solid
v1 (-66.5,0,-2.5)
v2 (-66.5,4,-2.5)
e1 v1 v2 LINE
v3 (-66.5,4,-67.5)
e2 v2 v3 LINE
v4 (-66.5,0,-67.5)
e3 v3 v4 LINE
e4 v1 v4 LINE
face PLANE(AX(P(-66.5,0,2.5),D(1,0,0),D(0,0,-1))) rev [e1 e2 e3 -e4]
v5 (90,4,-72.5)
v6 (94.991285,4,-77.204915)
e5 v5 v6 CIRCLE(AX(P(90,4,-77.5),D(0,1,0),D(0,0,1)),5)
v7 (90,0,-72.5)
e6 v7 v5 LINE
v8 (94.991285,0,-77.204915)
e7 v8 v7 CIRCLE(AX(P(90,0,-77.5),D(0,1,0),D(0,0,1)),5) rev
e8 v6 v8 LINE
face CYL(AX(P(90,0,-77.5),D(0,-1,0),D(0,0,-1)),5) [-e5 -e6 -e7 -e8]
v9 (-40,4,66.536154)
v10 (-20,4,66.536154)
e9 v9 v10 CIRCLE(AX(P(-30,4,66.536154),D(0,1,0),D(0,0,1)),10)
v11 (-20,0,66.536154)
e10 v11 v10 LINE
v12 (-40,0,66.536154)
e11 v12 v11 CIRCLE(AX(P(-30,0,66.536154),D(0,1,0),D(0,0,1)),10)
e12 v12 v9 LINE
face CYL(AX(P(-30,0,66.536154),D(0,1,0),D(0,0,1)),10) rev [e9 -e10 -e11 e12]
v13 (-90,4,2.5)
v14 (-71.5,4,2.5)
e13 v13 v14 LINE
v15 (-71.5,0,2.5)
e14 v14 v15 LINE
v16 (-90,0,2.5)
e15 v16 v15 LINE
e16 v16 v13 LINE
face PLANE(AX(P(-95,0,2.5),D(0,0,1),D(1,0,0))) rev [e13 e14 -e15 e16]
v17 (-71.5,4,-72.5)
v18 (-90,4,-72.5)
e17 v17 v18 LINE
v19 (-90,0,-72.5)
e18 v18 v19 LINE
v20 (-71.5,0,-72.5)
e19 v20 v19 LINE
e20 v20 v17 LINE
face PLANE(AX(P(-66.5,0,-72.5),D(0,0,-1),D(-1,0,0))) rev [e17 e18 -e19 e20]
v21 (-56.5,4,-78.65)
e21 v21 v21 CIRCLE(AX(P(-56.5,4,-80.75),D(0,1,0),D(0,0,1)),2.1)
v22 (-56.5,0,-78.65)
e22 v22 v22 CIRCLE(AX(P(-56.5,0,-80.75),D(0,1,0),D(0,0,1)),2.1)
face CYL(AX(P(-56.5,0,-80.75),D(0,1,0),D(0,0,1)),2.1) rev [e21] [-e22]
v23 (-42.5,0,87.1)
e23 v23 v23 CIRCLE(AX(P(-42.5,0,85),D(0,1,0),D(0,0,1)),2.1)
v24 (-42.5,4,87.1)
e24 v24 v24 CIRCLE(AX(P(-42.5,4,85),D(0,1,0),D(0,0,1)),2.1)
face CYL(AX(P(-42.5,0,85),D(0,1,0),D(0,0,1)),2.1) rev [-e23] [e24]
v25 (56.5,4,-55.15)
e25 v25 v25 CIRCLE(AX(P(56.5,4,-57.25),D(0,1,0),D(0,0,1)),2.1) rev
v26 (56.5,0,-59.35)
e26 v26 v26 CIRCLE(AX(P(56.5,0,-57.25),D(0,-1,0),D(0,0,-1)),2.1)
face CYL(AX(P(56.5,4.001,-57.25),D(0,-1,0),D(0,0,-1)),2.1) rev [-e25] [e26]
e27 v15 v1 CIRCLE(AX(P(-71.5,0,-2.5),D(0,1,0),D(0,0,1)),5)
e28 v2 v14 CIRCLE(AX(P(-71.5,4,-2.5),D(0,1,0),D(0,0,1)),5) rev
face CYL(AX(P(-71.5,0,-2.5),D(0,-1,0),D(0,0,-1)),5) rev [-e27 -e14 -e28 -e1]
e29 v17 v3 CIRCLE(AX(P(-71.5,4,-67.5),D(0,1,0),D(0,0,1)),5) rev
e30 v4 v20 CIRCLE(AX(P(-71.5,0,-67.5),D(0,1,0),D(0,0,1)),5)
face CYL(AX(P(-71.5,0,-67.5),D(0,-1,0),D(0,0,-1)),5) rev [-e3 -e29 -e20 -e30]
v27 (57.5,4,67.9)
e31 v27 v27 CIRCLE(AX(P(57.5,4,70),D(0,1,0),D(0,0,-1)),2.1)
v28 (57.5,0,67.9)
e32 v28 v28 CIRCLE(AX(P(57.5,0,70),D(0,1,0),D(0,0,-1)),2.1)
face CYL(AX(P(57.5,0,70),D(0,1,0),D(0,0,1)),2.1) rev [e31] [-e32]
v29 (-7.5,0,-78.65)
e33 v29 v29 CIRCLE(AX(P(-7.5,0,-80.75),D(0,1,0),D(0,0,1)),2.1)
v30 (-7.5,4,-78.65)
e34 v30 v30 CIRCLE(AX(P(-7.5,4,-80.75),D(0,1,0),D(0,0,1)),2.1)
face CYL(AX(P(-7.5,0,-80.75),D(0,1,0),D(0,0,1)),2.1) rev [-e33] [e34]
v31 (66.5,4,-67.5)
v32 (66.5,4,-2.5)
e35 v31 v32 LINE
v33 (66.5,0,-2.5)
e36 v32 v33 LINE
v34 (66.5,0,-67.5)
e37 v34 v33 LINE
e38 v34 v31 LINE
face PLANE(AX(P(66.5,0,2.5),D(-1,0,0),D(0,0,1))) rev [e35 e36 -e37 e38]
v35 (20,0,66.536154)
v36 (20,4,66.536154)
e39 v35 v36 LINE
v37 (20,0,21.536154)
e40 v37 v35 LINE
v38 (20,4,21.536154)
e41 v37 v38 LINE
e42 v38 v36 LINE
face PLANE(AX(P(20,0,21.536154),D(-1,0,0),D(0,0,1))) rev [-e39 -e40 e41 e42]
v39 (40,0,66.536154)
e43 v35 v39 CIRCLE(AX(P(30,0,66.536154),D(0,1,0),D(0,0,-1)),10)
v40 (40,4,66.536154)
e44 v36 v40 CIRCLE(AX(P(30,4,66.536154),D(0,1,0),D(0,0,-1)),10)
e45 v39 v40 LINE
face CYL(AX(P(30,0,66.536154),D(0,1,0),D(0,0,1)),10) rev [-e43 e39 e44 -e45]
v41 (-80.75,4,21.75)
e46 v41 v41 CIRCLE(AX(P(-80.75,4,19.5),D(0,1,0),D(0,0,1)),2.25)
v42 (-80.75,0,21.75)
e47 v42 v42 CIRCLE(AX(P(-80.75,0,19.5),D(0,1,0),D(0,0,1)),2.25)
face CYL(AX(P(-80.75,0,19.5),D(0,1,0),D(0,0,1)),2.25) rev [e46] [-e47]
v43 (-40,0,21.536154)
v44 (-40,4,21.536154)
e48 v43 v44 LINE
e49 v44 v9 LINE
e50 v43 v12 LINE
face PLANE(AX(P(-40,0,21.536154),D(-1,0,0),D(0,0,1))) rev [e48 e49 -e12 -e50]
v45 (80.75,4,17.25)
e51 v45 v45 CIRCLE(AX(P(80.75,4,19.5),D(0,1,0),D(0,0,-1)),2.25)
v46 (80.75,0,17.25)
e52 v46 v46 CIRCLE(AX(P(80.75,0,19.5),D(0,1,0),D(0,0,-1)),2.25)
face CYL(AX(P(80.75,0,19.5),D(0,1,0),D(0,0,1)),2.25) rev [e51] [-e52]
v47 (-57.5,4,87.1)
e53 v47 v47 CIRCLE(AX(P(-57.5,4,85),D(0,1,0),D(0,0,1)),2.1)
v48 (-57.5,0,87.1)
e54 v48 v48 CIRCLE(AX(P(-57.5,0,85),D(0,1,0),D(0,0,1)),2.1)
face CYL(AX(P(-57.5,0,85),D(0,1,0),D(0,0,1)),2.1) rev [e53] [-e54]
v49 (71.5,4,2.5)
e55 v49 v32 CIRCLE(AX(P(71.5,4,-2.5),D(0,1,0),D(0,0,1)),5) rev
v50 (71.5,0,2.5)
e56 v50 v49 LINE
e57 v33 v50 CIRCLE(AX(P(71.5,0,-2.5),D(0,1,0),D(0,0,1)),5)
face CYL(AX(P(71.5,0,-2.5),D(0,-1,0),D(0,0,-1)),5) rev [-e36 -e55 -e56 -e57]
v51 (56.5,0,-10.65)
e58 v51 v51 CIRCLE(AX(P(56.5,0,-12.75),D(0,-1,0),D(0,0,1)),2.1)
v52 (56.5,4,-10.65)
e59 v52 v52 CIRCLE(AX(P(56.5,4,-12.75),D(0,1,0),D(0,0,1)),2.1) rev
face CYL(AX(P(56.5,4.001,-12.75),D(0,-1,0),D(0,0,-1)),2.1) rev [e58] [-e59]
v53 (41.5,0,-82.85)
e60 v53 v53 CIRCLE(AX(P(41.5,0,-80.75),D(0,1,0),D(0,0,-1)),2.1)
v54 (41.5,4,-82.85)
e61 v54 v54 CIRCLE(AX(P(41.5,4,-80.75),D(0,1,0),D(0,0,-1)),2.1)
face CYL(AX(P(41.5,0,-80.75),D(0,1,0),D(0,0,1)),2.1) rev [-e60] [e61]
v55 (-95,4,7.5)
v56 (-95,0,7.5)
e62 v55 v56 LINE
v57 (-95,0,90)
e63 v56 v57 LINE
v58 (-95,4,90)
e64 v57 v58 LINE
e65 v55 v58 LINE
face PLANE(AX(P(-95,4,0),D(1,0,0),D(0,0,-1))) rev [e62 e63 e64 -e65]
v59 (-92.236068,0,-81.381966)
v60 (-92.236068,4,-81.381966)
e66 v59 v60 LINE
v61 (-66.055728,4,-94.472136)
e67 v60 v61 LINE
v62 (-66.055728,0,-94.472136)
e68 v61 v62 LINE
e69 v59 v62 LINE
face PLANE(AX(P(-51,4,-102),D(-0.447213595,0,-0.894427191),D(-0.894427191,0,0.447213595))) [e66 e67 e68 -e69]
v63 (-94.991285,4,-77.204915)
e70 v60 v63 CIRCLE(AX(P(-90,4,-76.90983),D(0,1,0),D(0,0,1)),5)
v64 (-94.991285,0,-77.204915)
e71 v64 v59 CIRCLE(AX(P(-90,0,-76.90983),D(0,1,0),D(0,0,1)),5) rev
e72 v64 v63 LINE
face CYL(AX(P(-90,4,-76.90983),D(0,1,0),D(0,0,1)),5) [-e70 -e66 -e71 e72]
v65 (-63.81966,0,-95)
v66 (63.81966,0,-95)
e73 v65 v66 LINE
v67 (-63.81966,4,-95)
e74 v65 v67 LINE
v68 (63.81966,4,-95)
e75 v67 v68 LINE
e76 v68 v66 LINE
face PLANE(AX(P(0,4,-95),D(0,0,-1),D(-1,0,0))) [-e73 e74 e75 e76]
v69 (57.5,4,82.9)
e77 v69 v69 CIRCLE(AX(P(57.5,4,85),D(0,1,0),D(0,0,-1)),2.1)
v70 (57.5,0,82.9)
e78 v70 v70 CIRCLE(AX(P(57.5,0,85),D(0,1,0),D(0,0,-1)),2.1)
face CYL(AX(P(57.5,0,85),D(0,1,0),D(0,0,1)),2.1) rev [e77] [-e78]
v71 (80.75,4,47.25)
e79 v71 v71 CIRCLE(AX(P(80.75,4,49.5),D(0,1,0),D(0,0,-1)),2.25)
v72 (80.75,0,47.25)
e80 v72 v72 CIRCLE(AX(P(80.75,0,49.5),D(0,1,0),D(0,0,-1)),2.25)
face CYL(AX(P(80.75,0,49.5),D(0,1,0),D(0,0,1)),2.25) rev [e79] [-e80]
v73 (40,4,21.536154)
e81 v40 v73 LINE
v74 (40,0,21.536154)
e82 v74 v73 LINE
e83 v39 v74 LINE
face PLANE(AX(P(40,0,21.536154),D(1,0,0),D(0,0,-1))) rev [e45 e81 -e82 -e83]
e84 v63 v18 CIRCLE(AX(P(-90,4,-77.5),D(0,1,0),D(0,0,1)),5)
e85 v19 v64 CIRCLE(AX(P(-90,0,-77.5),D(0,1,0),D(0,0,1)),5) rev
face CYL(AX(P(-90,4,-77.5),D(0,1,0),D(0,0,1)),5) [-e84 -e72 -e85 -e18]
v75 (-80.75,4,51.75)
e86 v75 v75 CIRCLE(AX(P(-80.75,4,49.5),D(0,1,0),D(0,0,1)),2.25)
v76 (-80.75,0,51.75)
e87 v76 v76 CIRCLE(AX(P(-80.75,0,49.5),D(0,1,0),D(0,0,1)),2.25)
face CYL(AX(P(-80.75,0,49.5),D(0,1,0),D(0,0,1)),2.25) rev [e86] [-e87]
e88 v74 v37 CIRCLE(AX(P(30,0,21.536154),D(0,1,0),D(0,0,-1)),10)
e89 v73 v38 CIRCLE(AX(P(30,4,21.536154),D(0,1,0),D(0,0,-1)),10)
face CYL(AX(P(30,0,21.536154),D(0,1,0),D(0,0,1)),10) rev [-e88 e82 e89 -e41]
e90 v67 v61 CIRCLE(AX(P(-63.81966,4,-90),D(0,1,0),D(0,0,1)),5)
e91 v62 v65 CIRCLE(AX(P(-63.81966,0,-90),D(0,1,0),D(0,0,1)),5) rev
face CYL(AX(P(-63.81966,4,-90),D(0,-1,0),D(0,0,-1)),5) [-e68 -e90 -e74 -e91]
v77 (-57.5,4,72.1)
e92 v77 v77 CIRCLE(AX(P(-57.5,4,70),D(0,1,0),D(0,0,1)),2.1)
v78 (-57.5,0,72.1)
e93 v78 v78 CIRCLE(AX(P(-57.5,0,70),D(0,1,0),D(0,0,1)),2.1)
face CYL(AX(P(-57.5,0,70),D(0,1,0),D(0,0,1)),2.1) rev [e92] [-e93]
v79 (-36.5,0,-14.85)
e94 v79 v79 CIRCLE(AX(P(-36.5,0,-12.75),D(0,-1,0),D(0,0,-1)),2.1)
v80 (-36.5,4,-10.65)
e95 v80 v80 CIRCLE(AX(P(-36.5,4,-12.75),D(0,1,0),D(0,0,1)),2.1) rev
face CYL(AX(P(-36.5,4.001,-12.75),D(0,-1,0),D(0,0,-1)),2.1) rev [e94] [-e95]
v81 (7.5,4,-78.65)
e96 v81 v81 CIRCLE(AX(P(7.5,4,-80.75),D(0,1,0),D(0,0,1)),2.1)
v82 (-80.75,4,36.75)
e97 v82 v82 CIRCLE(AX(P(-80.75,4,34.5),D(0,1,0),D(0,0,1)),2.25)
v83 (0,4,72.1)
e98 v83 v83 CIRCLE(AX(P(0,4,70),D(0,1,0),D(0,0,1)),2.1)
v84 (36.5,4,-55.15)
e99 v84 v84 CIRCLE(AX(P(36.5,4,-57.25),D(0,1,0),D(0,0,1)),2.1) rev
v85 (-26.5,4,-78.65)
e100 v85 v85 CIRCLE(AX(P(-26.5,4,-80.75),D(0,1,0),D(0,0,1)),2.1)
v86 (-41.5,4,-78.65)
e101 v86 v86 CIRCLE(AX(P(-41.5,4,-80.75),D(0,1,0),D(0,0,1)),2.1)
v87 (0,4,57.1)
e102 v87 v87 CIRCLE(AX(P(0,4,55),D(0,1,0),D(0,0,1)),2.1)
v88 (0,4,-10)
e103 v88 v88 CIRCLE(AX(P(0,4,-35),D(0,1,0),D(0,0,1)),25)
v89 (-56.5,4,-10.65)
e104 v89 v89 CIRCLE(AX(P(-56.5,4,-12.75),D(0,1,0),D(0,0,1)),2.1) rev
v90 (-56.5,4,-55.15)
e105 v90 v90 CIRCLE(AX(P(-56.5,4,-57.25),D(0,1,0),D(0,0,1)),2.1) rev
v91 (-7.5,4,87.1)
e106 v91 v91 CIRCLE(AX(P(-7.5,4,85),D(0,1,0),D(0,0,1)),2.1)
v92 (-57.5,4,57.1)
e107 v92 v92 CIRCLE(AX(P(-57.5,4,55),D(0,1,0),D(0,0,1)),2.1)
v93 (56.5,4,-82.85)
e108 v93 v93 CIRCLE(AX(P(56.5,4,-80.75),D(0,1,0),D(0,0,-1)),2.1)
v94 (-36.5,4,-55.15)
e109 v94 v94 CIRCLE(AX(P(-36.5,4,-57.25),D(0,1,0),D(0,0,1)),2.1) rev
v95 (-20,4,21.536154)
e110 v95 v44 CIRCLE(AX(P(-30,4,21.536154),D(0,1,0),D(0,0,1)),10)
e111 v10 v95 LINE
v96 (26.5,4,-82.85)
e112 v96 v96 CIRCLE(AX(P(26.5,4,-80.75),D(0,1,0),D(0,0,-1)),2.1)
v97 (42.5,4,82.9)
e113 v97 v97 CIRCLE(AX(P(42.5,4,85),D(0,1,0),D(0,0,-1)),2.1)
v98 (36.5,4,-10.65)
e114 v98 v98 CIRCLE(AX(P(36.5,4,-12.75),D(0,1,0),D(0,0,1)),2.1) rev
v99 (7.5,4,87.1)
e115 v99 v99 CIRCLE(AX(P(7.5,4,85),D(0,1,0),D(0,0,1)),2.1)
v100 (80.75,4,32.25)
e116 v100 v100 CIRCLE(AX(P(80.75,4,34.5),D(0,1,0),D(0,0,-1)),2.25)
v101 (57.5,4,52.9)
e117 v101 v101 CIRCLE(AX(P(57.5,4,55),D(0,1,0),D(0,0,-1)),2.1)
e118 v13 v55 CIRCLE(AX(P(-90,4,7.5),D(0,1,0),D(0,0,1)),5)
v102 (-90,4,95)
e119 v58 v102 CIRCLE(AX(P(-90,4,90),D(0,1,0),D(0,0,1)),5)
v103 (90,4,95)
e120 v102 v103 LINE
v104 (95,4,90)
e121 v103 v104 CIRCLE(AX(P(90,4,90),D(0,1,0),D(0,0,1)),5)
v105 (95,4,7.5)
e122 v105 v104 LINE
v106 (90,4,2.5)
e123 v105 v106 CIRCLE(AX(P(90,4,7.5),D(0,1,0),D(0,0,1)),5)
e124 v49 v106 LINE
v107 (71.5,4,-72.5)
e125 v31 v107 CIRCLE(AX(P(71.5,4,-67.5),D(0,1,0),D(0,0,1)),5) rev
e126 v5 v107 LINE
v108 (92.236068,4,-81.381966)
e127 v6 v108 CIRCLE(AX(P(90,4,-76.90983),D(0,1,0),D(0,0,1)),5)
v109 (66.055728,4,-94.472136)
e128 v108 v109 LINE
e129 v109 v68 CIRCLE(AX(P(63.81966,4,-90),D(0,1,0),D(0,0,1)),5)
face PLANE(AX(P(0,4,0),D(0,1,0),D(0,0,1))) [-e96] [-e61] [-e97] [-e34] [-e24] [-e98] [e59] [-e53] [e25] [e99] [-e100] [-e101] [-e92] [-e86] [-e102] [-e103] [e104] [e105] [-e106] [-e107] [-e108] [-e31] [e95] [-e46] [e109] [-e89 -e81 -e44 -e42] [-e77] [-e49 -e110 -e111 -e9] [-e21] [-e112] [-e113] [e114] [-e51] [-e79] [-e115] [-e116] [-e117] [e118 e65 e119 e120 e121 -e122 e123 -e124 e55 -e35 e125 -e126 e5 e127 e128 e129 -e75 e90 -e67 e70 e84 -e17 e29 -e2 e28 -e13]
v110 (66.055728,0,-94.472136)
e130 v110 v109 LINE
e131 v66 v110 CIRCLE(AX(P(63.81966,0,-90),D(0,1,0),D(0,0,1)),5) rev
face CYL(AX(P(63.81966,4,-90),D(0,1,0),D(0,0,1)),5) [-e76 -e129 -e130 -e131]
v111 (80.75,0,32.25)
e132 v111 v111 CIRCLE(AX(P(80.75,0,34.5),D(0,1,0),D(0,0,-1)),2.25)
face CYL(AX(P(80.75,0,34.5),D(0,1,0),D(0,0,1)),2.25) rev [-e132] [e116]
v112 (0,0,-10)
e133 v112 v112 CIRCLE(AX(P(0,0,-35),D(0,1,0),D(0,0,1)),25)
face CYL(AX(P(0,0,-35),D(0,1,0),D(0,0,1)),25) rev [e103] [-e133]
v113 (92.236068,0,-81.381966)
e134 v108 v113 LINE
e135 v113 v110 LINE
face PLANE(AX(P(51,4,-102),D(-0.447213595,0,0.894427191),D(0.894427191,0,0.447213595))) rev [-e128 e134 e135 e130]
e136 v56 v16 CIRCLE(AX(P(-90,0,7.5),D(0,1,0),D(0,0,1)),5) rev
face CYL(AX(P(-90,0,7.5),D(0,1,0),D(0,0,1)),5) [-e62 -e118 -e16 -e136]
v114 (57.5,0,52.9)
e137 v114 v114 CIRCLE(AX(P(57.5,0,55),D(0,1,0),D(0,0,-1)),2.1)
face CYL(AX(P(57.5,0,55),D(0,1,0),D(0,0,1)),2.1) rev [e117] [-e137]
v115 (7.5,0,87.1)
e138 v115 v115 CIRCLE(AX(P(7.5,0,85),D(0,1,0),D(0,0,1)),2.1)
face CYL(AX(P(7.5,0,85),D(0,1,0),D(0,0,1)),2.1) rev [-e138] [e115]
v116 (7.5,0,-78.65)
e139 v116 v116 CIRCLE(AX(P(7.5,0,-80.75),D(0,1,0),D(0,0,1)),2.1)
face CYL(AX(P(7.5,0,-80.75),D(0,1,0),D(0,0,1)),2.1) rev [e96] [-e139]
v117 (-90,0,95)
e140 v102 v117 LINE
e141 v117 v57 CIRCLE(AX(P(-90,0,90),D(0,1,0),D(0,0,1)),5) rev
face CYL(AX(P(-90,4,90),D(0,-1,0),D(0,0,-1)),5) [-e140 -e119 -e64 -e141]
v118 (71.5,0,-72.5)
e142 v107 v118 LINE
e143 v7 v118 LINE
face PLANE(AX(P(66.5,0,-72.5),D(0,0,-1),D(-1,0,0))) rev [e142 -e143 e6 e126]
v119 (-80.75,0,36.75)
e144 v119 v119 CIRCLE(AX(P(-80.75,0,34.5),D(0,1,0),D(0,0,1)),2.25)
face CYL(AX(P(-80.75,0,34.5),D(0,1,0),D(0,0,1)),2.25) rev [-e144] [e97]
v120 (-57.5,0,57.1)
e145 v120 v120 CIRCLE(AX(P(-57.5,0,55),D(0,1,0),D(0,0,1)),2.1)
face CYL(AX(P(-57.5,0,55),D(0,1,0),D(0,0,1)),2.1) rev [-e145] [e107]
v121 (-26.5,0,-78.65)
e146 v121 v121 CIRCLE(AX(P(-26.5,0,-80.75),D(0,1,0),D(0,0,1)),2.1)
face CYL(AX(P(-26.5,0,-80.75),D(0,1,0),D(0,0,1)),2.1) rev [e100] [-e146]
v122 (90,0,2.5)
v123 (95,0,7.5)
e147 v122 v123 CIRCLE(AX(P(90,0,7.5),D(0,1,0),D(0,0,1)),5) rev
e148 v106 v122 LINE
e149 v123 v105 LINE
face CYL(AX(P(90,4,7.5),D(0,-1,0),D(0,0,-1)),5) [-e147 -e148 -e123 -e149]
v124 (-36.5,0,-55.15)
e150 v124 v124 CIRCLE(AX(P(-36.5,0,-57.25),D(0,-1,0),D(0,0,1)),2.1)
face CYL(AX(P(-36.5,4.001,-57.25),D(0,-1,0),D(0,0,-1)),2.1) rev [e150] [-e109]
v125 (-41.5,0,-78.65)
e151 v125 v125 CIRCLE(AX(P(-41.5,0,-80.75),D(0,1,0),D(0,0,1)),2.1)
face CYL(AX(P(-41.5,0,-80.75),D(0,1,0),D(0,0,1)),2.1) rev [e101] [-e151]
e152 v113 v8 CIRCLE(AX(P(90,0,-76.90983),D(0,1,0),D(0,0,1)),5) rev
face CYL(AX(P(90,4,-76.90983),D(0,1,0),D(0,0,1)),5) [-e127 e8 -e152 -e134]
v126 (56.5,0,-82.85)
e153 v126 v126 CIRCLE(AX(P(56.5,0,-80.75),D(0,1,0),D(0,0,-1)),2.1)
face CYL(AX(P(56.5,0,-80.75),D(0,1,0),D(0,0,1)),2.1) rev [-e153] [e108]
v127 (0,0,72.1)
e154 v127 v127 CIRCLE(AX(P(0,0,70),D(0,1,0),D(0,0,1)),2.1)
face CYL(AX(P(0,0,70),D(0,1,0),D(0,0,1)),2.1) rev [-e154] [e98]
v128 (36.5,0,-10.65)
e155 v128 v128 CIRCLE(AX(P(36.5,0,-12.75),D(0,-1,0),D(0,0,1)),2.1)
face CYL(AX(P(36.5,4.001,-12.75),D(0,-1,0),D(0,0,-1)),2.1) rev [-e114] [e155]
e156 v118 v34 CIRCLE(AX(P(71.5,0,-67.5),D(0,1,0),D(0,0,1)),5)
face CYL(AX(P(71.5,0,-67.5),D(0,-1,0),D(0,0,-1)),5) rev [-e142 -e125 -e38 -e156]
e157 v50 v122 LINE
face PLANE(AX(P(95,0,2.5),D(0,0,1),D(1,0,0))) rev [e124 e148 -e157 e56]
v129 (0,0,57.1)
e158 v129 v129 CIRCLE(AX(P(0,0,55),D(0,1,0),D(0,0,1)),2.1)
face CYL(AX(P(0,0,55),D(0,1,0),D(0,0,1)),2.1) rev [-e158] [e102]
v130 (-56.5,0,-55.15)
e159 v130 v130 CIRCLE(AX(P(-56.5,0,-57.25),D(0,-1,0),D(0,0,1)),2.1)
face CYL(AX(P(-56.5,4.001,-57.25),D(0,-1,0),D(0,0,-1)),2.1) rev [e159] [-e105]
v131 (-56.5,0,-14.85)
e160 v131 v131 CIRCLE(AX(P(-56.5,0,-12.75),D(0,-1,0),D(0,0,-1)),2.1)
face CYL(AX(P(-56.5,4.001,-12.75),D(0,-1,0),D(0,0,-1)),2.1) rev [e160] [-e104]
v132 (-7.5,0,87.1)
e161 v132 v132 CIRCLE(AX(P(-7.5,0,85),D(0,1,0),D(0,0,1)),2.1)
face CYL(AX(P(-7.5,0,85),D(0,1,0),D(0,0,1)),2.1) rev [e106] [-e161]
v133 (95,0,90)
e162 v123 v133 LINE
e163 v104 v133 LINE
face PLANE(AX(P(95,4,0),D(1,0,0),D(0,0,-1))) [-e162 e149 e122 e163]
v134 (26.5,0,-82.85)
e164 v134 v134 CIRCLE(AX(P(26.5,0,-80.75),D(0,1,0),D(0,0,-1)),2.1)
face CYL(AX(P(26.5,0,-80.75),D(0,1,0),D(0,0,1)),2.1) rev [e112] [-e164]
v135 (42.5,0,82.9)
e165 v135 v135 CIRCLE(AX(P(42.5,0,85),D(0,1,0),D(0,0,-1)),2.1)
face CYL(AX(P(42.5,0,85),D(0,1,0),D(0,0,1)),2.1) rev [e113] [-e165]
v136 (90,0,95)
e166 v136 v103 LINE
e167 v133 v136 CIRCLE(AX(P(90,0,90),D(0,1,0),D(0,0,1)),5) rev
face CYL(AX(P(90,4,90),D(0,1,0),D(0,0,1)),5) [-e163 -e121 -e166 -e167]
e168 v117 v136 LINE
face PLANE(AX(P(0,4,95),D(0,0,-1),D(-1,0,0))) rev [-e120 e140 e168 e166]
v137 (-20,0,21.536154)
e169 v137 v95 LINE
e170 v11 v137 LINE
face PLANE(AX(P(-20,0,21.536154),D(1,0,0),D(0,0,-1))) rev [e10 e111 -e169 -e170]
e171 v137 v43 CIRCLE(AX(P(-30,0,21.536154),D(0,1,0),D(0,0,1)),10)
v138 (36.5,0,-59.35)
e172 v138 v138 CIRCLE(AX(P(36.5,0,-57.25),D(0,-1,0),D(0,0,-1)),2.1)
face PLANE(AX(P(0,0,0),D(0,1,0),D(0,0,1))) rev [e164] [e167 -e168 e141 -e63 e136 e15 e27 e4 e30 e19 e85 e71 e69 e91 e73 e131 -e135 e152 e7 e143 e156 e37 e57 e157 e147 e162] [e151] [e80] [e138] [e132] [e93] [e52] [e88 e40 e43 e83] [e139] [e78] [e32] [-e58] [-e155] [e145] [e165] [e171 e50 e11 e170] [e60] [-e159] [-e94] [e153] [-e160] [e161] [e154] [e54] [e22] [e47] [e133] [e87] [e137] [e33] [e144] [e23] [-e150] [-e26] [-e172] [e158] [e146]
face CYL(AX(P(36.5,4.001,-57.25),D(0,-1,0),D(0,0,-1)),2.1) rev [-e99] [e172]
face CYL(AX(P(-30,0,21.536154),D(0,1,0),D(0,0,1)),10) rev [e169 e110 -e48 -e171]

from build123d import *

# Parameters (mm, degrees)
SALIENTE_EXTRUIR1_DEPTH = 4
CROQUIS3_W              = 28.5
CROQUIS3_H              = 75
CORTAR_EXTRUIR1_DEPTH   = 135.40982107
CROQUIS4_R              = 2.25
CROQUIS4_R_2            = 2.1
CORTAR_EXTRUIR2_DEPTH   = 135.40982107
CROQUIS5_R              = 25
CORTAR_EXTRUIR3_DEPTH   = 135.40982107
REDONDEO1_R             = 5
CROQUIS6_R              = 2.1
CORTAR_EXTRUIR4_DEPTH   = 135.40982107
CROQUIS7_R              = 2.1
CORTAR_EXTRUIR5_DEPTH   = 135.40982107
CORTAR_EXTRUIR6_REACH   = 136.41
CROQUIS8_R              = 2.1
CROQUIS9_R              = 2.1
CORTAR_EXTRUIR7_DEPTH   = 135.40982107


with BuildPart() as part:
    # Croquis2 → Saliente-Extruir1 (new body)
    with BuildSketch(Plane(origin=(0, 0, 0), x_dir=(1, 0, 0), z_dir=(0, 1, 0))):
        Polygon((-65, 95), (-95, 80), (-95, -95), (95, -95), (95, 80), (65, 95), align=None)
    extrude(amount=SALIENTE_EXTRUIR1_DEPTH)

    # Croquis3 → Cortar-Extruir1 (cut, through all)
    with BuildSketch(Plane(origin=(0, 4, 0), x_dir=(1, 0, 0), z_dir=(0, 1, 0))):
        with Locations((-80.75, 35)):
            Rectangle(CROQUIS3_W, CROQUIS3_H)
        with Locations((80.75, 35)):
            Rectangle(CROQUIS3_W, CROQUIS3_H)
    extrude(amount=-CORTAR_EXTRUIR1_DEPTH, mode=Mode.SUBTRACT)

    # Croquis4 → Cortar-Extruir2 (cut, through all)
    with BuildSketch(Plane(origin=(0, 4, 0), x_dir=(1, 0, 0), z_dir=(0, 1, 0))):
        with Locations(Location((-80.75, -19.5, 0), (0, 0, 270))):
            Circle(CROQUIS4_R)
        with Locations(Location((-80.75, -34.5, 0), (0, 0, 270))):
            Circle(CROQUIS4_R)
        with Locations(Location((-80.75, -49.5, 0), (0, 0, 270))):
            Circle(CROQUIS4_R)
        with Locations(Location((-56.5, 80.75, 0), (0, 0, 270))):
            Circle(CROQUIS4_R_2)
        with Locations(Location((-41.5, 80.75, 0), (0, 0, 270))):
            Circle(CROQUIS4_R_2)
        with Locations(Location((-26.5, 80.75, 0), (0, 0, 270))):
            Circle(CROQUIS4_R_2)
        with Locations(Location((80.75, -49.5, 0), (0, 0, 90))):
            Circle(CROQUIS4_R)
        with Locations(Location((80.75, -34.5, 0), (0, 0, 90))):
            Circle(CROQUIS4_R)
        with Locations(Location((80.75, -19.5, 0), (0, 0, 90))):
            Circle(CROQUIS4_R)
        with Locations(Location((26.5, 80.75, 0), (0, 0, 90))):
            Circle(CROQUIS4_R_2)
        with Locations(Location((41.5, 80.75, 0), (0, 0, 90))):
            Circle(CROQUIS4_R_2)
        with Locations(Location((56.5, 80.75, 0), (0, 0, 90))):
            Circle(CROQUIS4_R_2)
    extrude(amount=-CORTAR_EXTRUIR2_DEPTH, mode=Mode.SUBTRACT)

    # Croquis5 → Cortar-Extruir3 (cut, through all)
    with BuildSketch(Plane(origin=(0, 4, 0), x_dir=(1, 0, 0), z_dir=(0, 1, 0))):
        with Locations(Location((0, 35, 0), (0, 0, 270))):
            Circle(CROQUIS5_R)
        with BuildLine():
            Line((-20, -21.536154127), (-20, -66.536154127))
            ThreePointArc((-20, -66.536154127), (-30, -76.536154127), (-40, -66.536154127))
            Line((-40, -66.536154127), (-40, -21.536154127))
            ThreePointArc((-40, -21.536154127), (-30, -11.536154127), (-20, -21.536154127))
        make_face()
        with BuildLine():
            Line((20, -21.536154127), (20, -66.536154127))
            ThreePointArc((20, -66.536154127), (30, -76.536154127), (40, -66.536154127))
            Line((40, -66.536154127), (40, -21.536154127))
            ThreePointArc((40, -21.536154127), (30, -11.536154127), (20, -21.536154127))
        make_face()
    extrude(amount=-CORTAR_EXTRUIR3_DEPTH, mode=Mode.SUBTRACT)

    # Redondeo1
    # the kernel refuses this fillet: 5 mm, written as the material it adds along each edge
    with BuildSketch(Plane(origin=(-66.5, 4, -72.5), x_dir=(-1, 0, 0), z_dir=(0, -1, 0)), Plane(origin=(-66.5, 4, 2.5), x_dir=(0, 0, -1), z_dir=(0, -1, 0))) as redondeo1_piece_1:
        with BuildLine():
            CenterArc((REDONDEO1_R, -REDONDEO1_R), REDONDEO1_R, 90, 90)
            Line((0, -REDONDEO1_R), (0, 0))
            Line((0, 0), (REDONDEO1_R, 0))
        make_face()
    extrude(amount=4)
    with BuildSketch(Plane(origin=(66.5, 4, -72.5), x_dir=(1, 0, 0), z_dir=(0, -1, 0)), Plane(origin=(66.5, 4, 2.5), x_dir=(0, 0, -1), z_dir=(0, -1, 0))) as redondeo1_piece_2:
        with BuildLine():
            CenterArc((REDONDEO1_R, REDONDEO1_R), REDONDEO1_R, 180, 90)
            Line((0, REDONDEO1_R), (0, 0))
            Line((0, 0), (REDONDEO1_R, 0))
        make_face()
    extrude(amount=4)
    # the kernel refuses this fillet: 5 mm, written as the material it takes off along each edge
    with BuildSketch(Plane(origin=(95, -12.5, 95), x_dir=(0, 0, -1), z_dir=(0, 1, 0)), Plane(origin=(-95, -12.5, 95), x_dir=(1, 0, 0), z_dir=(0, 1, 0)), Plane(origin=(-95, 16.5, -72.5), x_dir=(0, 0, -1), z_dir=(0, -1, 0))) as redondeo1_2_piece_1:
        with BuildLine():
            CenterArc((REDONDEO1_R, REDONDEO1_R), REDONDEO1_R, 180, 90)
            Line((0, REDONDEO1_R), (0, 0))
            Line((0, 0), (REDONDEO1_R, 0))
        make_face()
    extrude(amount=29, mode=Mode.SUBTRACT)
    with BuildSketch(Plane(origin=(-95, -7.725424859, -80), x_dir=(0.894427190999916, 0, -0.447213595499958), z_dir=(0, 1, 0))) as redondeo1_2_piece_2:
        with BuildLine():
            CenterArc((REDONDEO1_R * 0.61803398875, -REDONDEO1_R), REDONDEO1_R, 90, 63.434948823)
            Line((-REDONDEO1_R * 0.27639320225, -REDONDEO1_R * 0.5527864045), (0, 0))
            Line((0, 0), (REDONDEO1_R * 0.61803398875, 0))
        make_face()
    extrude(amount=19.450849719, mode=Mode.SUBTRACT)
    with BuildSketch(Plane(origin=(-65, -2.950849719, -95), x_dir=(1, 0, 0), z_dir=(0, 1, 0)), Plane(origin=(65, -2.950849719, -95), x_dir=(0.8944271909999183, 0, 0.44721359549995315), z_dir=(0, 1, 0))) as redondeo1_2_piece_3:
        with BuildLine():
            CenterArc((REDONDEO1_R * 0.2360679775, -REDONDEO1_R), REDONDEO1_R, 90, 26.565051177)
            Line((-REDONDEO1_R * 0.211145618, -REDONDEO1_R * 0.105572809), (0, 0))
            Line((0, 0), (REDONDEO1_R * 0.2360679775, 0))
        make_face()
    extrude(amount=9.901699437, mode=Mode.SUBTRACT)
    with BuildSketch(Plane(origin=(95, -7.725424859, -80), x_dir=(-0.894427190999915, 0, -0.4472135954999598), z_dir=(0, 1, 0))) as redondeo1_2_piece_4:
        with BuildLine():
            CenterArc((REDONDEO1_R * 0.61803398875, REDONDEO1_R), REDONDEO1_R, 206.565051177, 63.434948823)
            Line((-REDONDEO1_R * 0.27639320225, REDONDEO1_R * 0.5527864045), (0, 0))
            Line((0, 0), (REDONDEO1_R * 0.61803398875, 0))
        make_face()
    extrude(amount=19.450849719, mode=Mode.SUBTRACT)
    with BuildSketch(Plane(origin=(-95, 16.5, 2.5), x_dir=(0, 0, 1), z_dir=(0, -1, 0)), Plane(origin=(95, 16.5, -72.5), x_dir=(0, 0, -1), z_dir=(0, -1, 0)), Plane(origin=(95, 16.5, 2.5), x_dir=(-1, 0, 0), z_dir=(0, -1, 0))) as redondeo1_2_piece_5:
        with BuildLine():
            CenterArc((REDONDEO1_R, -REDONDEO1_R), REDONDEO1_R, 90, 90)
            Line((0, -REDONDEO1_R), (0, 0))
            Line((0, 0), (REDONDEO1_R, 0))
        make_face()
    extrude(amount=29, mode=Mode.SUBTRACT)

    # Croquis6 → Cortar-Extruir4 (cut, through all)
    with BuildSketch(Plane(origin=(0, 4, 0), x_dir=(1, 0, 0), z_dir=(0, 1, 0))):
        with Locations(Location((-57.5, -85, 0), (0, 0, 270))):
            Circle(CROQUIS6_R)
        with Locations(Location((-42.5, -85, 0), (0, 0, 270))):
            Circle(CROQUIS6_R)
        with Locations(Location((42.5, -85, 0), (0, 0, 90))):
            Circle(CROQUIS6_R)
        with Locations(Location((57.5, -85, 0), (0, 0, 90))):
            Circle(CROQUIS6_R)
        with Locations(Location((-7.5, -85, 0), (0, 0, 270))):
            Circle(CROQUIS6_R)
        with Locations(Location((7.5, -85, 0), (0, 0, 270))):
            Circle(CROQUIS6_R)
    extrude(amount=-CORTAR_EXTRUIR4_DEPTH, mode=Mode.SUBTRACT)

    # Croquis7 → Cortar-Extruir5 (cut, through all)
    with BuildSketch(Plane(origin=(0, 4, 0), x_dir=(1, 0, 0), z_dir=(0, 1, 0))):
        with Locations(Location((-57.5, -70, 0), (0, 0, 270))):
            Circle(CROQUIS7_R)
        with Locations(Location((-57.5, -55, 0), (0, 0, 270))):
            Circle(CROQUIS7_R)
        with Locations(Location((57.5, -55, 0), (0, 0, 90))):
            Circle(CROQUIS7_R)
        with Locations(Location((57.5, -70, 0), (0, 0, 90))):
            Circle(CROQUIS7_R)
        with Locations(Location((0, -70, 0), (0, 0, 270))):
            Circle(CROQUIS7_R)
        with Locations(Location((0, -55, 0), (0, 0, 270))):
            Circle(CROQUIS7_R)
    extrude(amount=-CORTAR_EXTRUIR5_DEPTH, mode=Mode.SUBTRACT)

    # Croquis8 → Cortar-Extruir6 (cut, up to next)
    with BuildSketch(Plane.XZ, mode=Mode.PRIVATE) as cortar_extruir6_sk1:
        with Locations(Location((56.5, -57.25, 0), (0, 0, 270))):
            Circle(CROQUIS8_R)
    cortar_extruir6_tool1 = extrude(cortar_extruir6_sk1.sketch, amount=-CORTAR_EXTRUIR6_REACH, mode=Mode.PRIVATE) & part.part
    # Croquis8 → Cortar-Extruir6 (cut, up to next)
    with BuildSketch(Plane.XZ, mode=Mode.PRIVATE) as cortar_extruir6_sk2:
        with Locations(Location((36.5, -57.25, 0), (0, 0, 270))):
            Circle(CROQUIS8_R)
    cortar_extruir6_tool2 = extrude(cortar_extruir6_sk2.sketch, amount=-CORTAR_EXTRUIR6_REACH, mode=Mode.PRIVATE) & part.part
    # Croquis8 → Cortar-Extruir6 (cut, up to next)
    with BuildSketch(Plane.XZ, mode=Mode.PRIVATE) as cortar_extruir6_sk3:
        with Locations(Location((56.5, -12.75, 0), (0, 0, 90))):
            Circle(CROQUIS8_R)
    cortar_extruir6_tool3 = extrude(cortar_extruir6_sk3.sketch, amount=-CORTAR_EXTRUIR6_REACH, mode=Mode.PRIVATE) & part.part
    # Croquis8 → Cortar-Extruir6 (cut, up to next)
    with BuildSketch(Plane.XZ, mode=Mode.PRIVATE) as cortar_extruir6_sk4:
        with Locations(Location((36.5, -12.75, 0), (0, 0, 90))):
            Circle(CROQUIS8_R)
    cortar_extruir6_tool4 = extrude(cortar_extruir6_sk4.sketch, amount=-CORTAR_EXTRUIR6_REACH, mode=Mode.PRIVATE) & part.part
    # Croquis8 → Cortar-Extruir6 (cut, up to next)
    with BuildSketch(Plane.XZ, mode=Mode.PRIVATE) as cortar_extruir6_sk5:
        with Locations(Location((-36.5, -12.75, 0), (0, 0, 270))):
            Circle(CROQUIS8_R)
    cortar_extruir6_tool5 = extrude(cortar_extruir6_sk5.sketch, amount=-CORTAR_EXTRUIR6_REACH, mode=Mode.PRIVATE) & part.part
    # Croquis8 → Cortar-Extruir6 (cut, up to next)
    with BuildSketch(Plane.XZ, mode=Mode.PRIVATE) as cortar_extruir6_sk6:
        with Locations(Location((-56.5, -12.75, 0), (0, 0, 270))):
            Circle(CROQUIS8_R)
    cortar_extruir6_tool6 = extrude(cortar_extruir6_sk6.sketch, amount=-CORTAR_EXTRUIR6_REACH, mode=Mode.PRIVATE) & part.part
    # Croquis8 → Cortar-Extruir6 (cut, up to next)
    with BuildSketch(Plane.XZ, mode=Mode.PRIVATE) as cortar_extruir6_sk7:
        with Locations(Location((-36.5, -57.25, 0), (0, 0, 90))):
            Circle(CROQUIS8_R)
    cortar_extruir6_tool7 = extrude(cortar_extruir6_sk7.sketch, amount=-CORTAR_EXTRUIR6_REACH, mode=Mode.PRIVATE) & part.part
    # Croquis8 → Cortar-Extruir6 (cut, up to next)
    with BuildSketch(Plane.XZ, mode=Mode.PRIVATE) as cortar_extruir6_sk8:
        with Locations(Location((-56.5, -57.25, 0), (0, 0, 90))):
            Circle(CROQUIS8_R)
    cortar_extruir6_tool8 = extrude(cortar_extruir6_sk8.sketch, amount=-CORTAR_EXTRUIR6_REACH, mode=Mode.PRIVATE) & part.part
    add(cortar_extruir6_tool1.solids().sort_by_distance((56.5, 0, -57.25))[0], mode=Mode.SUBTRACT)
    add(cortar_extruir6_tool2.solids().sort_by_distance((36.5, 0, -57.25))[0], mode=Mode.SUBTRACT)
    add(cortar_extruir6_tool3.solids().sort_by_distance((56.5, 0, -12.75))[0], mode=Mode.SUBTRACT)
    add(cortar_extruir6_tool4.solids().sort_by_distance((36.5, 0, -12.75))[0], mode=Mode.SUBTRACT)
    add(cortar_extruir6_tool5.solids().sort_by_distance((-36.5, 0, -12.75))[0], mode=Mode.SUBTRACT)
    add(cortar_extruir6_tool6.solids().sort_by_distance((-56.5, 0, -12.75))[0], mode=Mode.SUBTRACT)
    add(cortar_extruir6_tool7.solids().sort_by_distance((-36.5, 0, -57.25))[0], mode=Mode.SUBTRACT)
    add(cortar_extruir6_tool8.solids().sort_by_distance((-56.5, 0, -57.25))[0], mode=Mode.SUBTRACT)

    # Croquis9 → Cortar-Extruir7 (cut, through all)
    with BuildSketch(Plane(origin=(0, 4, 0), x_dir=(1, 0, 0), z_dir=(0, 1, 0))):
        with Locations(Location((-7.5, 80.75, 0), (0, 0, 270))):
            Circle(CROQUIS9_R)
        with Locations(Location((7.5, 80.75, 0), (0, 0, 270))):
            Circle(CROQUIS9_R)
    extrude(amount=-CORTAR_EXTRUIR7_DEPTH, mode=Mode.SUBTRACT)


solid = part.part
